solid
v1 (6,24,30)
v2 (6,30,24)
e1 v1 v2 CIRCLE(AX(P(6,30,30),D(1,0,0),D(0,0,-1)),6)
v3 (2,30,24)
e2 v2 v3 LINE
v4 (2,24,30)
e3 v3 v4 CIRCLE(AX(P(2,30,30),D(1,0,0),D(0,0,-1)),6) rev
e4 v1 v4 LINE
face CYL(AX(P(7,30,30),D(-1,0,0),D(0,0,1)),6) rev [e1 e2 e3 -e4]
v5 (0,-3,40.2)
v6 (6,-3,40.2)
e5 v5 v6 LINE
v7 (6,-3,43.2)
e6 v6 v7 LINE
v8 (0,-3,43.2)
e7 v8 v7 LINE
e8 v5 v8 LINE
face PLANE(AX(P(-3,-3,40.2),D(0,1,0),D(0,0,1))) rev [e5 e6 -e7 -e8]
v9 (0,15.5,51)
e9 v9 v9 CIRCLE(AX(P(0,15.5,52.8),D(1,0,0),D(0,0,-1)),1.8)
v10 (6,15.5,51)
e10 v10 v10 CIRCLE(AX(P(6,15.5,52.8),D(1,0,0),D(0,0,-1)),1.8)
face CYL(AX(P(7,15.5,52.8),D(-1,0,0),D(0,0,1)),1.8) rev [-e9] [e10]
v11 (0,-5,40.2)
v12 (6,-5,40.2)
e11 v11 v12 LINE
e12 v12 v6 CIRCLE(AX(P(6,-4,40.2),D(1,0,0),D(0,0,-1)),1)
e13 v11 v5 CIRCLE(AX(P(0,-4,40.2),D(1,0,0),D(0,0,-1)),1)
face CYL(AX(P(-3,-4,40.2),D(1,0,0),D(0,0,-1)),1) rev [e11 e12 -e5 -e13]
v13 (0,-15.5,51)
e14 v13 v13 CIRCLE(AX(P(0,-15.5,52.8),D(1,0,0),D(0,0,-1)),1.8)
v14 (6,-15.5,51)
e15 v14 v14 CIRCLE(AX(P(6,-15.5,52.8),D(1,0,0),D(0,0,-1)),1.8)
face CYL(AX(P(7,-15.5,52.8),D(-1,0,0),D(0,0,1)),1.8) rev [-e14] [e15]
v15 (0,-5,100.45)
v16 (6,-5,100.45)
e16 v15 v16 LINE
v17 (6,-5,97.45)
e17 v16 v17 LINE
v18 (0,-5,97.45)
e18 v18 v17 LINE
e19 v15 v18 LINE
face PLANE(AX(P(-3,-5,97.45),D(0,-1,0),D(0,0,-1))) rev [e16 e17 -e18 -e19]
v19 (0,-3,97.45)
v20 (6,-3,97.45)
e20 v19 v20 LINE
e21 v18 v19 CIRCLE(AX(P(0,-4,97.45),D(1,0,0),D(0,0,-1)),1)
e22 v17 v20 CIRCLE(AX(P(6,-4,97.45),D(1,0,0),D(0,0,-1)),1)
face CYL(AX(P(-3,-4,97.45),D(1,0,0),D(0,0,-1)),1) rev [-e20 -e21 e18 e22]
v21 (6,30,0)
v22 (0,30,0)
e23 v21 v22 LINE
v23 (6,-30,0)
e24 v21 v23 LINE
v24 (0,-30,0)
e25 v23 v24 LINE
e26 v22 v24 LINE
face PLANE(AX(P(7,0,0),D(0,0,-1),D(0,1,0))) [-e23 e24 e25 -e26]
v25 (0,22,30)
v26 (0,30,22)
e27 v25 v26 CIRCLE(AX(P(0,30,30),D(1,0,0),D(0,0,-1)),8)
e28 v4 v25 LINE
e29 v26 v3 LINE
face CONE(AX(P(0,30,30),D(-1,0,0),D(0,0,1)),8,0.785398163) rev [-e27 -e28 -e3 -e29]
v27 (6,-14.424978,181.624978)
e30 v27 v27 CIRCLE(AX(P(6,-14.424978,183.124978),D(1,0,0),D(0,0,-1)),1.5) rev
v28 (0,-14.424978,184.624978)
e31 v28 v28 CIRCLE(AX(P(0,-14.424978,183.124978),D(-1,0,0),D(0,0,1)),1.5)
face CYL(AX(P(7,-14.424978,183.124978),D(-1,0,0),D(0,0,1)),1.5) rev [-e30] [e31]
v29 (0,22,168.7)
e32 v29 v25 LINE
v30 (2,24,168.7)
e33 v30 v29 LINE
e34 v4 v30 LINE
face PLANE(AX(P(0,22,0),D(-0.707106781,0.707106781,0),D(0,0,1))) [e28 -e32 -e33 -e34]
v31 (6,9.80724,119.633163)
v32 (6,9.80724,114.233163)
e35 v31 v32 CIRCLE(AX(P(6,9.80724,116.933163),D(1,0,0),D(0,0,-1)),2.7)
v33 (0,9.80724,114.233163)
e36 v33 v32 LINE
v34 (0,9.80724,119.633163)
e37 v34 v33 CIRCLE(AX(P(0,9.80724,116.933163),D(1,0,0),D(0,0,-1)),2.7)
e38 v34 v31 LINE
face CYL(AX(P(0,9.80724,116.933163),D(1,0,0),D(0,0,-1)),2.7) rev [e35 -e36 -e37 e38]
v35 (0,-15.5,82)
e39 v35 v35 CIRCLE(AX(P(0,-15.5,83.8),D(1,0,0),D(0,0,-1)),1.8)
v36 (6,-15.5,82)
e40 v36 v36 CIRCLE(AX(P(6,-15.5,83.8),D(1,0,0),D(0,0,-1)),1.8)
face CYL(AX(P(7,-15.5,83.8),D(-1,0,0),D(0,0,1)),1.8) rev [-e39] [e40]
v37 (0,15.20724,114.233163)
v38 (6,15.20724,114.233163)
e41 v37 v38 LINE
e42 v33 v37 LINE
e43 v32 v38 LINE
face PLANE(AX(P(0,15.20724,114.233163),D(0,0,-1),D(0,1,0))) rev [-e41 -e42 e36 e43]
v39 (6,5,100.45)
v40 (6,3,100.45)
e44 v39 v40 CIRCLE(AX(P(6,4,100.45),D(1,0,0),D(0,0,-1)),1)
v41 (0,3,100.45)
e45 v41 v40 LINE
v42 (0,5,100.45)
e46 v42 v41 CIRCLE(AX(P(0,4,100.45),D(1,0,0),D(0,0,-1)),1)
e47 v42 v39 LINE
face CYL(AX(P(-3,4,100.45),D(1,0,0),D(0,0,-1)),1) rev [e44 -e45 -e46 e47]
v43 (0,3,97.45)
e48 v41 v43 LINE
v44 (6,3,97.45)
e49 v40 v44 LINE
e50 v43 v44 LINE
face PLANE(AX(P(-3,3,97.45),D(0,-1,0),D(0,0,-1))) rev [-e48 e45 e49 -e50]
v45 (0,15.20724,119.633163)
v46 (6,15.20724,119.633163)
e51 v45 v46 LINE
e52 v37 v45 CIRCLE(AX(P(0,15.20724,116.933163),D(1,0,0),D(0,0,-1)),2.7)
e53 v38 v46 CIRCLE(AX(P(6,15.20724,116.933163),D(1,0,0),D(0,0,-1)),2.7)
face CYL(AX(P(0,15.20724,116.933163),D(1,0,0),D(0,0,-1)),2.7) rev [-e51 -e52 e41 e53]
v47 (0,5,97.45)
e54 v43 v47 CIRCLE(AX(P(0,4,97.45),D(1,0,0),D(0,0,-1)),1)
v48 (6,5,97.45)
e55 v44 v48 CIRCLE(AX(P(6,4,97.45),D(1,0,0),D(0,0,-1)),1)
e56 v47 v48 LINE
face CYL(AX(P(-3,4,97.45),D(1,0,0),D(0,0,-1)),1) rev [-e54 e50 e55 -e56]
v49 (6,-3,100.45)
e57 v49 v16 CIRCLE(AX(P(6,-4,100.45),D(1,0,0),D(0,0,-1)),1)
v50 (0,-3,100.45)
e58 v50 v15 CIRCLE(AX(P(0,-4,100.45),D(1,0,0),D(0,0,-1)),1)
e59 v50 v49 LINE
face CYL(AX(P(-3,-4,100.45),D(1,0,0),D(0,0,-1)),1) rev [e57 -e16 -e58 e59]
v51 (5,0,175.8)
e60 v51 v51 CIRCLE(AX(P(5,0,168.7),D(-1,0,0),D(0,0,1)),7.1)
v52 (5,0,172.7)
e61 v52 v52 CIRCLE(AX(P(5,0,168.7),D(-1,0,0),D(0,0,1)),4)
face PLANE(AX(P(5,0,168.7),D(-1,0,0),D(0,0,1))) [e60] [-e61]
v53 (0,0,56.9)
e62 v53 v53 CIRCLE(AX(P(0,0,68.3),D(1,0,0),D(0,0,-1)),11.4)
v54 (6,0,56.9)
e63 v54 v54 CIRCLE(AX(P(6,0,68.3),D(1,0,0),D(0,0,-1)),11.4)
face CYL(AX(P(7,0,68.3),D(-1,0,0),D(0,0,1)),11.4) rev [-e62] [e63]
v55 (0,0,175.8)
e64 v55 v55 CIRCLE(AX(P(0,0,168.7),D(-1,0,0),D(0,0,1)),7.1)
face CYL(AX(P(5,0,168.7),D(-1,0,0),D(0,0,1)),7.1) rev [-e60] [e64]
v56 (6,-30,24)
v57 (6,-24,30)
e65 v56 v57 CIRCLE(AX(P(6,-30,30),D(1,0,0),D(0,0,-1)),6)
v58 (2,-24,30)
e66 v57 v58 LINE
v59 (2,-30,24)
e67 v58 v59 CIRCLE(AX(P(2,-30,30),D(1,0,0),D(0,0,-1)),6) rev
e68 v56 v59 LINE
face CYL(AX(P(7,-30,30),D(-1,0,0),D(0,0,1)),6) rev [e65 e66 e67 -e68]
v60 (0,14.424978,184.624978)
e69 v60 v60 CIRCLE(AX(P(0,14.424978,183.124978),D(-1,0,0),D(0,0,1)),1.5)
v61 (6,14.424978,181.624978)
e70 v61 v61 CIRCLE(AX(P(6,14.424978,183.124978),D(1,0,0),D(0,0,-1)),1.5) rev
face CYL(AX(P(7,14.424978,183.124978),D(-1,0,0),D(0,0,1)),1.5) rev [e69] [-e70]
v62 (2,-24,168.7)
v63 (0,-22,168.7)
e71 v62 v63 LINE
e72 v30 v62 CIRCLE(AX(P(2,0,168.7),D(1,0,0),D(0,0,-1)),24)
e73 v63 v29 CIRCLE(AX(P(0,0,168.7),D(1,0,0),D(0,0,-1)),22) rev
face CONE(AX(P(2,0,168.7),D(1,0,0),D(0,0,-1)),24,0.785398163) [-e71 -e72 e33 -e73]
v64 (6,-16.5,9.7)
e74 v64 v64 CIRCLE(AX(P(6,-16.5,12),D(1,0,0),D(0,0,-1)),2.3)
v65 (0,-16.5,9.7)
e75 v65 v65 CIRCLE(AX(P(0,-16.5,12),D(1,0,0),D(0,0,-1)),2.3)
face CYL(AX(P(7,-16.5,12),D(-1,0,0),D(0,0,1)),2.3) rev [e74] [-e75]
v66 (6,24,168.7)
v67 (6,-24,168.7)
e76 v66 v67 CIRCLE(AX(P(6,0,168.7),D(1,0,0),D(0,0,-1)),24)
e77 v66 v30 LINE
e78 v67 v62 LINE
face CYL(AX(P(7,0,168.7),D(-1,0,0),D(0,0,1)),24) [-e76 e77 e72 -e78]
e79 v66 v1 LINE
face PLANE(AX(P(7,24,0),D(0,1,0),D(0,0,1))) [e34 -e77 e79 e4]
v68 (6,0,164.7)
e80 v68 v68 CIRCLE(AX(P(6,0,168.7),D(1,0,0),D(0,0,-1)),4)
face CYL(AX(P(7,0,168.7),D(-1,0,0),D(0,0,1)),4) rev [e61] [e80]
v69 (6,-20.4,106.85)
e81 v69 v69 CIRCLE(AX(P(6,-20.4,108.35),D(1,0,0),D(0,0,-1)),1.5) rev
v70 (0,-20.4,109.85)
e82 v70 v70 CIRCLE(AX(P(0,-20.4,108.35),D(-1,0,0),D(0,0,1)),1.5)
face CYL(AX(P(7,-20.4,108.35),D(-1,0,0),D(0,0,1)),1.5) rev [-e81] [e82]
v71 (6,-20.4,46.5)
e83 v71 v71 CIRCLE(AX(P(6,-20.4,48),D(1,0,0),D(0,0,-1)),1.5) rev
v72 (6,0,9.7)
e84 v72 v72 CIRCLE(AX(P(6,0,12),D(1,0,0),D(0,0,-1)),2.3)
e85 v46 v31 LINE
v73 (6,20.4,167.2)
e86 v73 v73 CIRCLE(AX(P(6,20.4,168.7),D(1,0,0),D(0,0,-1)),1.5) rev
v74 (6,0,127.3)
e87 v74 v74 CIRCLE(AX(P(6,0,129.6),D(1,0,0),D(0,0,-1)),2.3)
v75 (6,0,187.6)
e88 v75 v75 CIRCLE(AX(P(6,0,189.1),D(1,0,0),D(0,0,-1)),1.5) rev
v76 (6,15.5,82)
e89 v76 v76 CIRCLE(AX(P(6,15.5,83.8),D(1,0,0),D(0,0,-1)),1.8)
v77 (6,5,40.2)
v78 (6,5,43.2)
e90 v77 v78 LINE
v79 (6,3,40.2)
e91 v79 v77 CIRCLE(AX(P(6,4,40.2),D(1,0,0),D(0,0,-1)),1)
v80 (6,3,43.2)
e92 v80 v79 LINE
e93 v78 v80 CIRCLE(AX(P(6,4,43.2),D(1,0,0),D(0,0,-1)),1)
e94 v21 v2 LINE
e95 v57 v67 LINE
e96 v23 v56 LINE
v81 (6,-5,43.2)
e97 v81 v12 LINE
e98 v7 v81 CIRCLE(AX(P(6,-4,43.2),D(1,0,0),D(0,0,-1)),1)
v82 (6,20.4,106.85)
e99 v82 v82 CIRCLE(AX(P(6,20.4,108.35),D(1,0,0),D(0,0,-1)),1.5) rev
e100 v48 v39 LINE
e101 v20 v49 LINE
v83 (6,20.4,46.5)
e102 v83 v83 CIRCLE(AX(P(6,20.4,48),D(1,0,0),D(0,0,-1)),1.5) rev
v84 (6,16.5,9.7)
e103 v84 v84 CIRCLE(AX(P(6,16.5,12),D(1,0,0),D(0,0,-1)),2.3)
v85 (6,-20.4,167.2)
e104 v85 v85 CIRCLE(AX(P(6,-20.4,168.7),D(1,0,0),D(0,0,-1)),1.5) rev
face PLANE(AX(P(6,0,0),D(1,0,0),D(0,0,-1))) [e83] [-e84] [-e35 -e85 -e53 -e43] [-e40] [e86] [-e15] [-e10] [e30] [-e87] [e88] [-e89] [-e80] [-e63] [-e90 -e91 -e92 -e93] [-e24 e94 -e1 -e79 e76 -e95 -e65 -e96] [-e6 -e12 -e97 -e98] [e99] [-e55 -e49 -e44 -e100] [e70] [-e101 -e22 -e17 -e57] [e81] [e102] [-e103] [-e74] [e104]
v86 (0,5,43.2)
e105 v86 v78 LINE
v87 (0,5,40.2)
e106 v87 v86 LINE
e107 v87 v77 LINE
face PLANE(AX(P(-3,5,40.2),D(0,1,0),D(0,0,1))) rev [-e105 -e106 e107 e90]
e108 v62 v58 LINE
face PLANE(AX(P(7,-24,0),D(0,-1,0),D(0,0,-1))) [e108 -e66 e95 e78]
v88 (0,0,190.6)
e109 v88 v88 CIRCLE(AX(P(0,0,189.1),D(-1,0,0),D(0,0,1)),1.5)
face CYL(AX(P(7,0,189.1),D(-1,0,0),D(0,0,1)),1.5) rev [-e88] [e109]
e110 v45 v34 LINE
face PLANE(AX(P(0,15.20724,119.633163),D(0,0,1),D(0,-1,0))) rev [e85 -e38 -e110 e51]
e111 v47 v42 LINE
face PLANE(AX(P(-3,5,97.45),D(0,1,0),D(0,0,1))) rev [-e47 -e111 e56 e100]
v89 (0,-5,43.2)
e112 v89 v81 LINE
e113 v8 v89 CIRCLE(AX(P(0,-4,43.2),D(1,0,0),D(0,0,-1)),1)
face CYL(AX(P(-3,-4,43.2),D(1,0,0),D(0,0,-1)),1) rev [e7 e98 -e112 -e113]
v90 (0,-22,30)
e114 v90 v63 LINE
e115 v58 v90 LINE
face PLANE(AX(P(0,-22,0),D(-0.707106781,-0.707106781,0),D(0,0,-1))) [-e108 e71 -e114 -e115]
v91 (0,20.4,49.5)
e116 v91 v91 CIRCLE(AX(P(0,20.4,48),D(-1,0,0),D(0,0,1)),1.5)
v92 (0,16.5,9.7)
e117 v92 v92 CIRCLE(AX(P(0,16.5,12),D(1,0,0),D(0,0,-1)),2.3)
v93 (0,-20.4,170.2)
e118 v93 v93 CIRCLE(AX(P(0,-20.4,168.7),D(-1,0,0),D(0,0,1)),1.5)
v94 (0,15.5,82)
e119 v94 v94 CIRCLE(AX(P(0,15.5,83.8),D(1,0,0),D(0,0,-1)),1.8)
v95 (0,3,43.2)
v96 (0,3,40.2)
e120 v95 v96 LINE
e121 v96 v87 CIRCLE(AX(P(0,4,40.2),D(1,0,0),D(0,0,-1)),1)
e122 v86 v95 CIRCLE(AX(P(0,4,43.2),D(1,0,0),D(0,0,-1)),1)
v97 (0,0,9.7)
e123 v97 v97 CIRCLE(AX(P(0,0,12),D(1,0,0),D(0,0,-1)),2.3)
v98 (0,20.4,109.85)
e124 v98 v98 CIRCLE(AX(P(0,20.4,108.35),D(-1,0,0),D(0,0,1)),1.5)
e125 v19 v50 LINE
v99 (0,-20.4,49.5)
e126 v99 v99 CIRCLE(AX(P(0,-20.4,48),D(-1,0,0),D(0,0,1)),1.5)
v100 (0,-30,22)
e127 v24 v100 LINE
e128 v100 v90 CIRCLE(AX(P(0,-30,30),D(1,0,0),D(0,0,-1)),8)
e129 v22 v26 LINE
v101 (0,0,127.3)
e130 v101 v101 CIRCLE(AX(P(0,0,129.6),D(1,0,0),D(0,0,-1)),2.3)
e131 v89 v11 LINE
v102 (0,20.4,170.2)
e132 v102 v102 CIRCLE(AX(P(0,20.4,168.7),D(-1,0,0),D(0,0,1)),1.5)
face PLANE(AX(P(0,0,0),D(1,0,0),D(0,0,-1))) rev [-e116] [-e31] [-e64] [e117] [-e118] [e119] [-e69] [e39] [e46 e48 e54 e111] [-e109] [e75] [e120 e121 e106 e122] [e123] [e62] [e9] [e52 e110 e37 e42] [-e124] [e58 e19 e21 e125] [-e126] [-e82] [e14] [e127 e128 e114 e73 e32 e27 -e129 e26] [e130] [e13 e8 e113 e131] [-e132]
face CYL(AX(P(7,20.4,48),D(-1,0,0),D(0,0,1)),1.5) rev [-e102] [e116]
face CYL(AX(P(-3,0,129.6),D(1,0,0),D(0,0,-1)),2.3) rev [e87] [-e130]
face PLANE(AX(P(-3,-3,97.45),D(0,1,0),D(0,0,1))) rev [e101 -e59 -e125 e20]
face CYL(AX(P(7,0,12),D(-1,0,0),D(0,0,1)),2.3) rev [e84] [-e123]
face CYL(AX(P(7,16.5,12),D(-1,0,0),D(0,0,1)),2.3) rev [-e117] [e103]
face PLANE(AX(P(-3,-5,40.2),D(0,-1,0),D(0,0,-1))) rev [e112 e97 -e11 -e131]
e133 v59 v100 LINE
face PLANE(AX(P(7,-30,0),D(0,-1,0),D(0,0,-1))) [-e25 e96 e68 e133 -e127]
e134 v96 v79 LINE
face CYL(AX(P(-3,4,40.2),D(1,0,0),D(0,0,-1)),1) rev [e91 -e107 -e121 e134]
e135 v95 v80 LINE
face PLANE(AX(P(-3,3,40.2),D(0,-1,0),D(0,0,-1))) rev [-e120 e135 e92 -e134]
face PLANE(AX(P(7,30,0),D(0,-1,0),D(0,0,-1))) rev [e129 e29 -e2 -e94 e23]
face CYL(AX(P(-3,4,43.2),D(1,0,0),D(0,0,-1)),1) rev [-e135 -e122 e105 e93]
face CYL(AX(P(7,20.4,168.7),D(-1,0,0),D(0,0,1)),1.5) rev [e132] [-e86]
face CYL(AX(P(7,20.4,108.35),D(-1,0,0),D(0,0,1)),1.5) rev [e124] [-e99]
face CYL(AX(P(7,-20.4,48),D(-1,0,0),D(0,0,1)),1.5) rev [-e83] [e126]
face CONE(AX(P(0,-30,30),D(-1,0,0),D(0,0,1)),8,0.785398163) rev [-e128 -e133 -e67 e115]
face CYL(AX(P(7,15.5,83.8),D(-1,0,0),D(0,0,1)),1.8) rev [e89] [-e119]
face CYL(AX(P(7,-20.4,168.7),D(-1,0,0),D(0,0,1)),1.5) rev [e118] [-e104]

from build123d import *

# Parameters (mm, degrees)
SKETCH1_R              = 11.4
SKETCH1_R_2            = 1.8
SKETCH1_R_3            = 2.3
SKETCH1_R_4            = 4
BOSS_EXTRUDE1_DEPTH    = 7
CHAMFER2_SIZE          = 2
CUT_EXTRUDE2_DEPTH     = 196.146842147
SKETCH4_R              = 1.5
CUT_EXTRUDE3_DEPTH     = 196.146842147
SKETCH6_R              = 7.1
CUT_EXTRUDE4_DEPTH     = 5
SKETCH7_R              = 2.3
CUT_EXTRUDE5_DEPTH     = 10
CUT_EXTRUDE6_DEPTH     = 10
MOVE_START             = 6
MOVE_FACE2_OUTLINE_R   = 2.3
MOVE_FACE2_OUTLINE_R_2 = 1.5
MOVE_FACE2_OUTLINE_R_3 = 1.8
MOVE_FACE2_OUTLINE_R_4 = 11.4
MOVE_FACE2_OUTLINE_R_5 = 4
MOVE_FACE2_DEPTH       = 1


# Read off the part's stored shape, not the designer's step: Move Face2
with BuildPart() as part:
    # Sketch1 → Boss-Extrude1 (new body)
    with BuildSketch(Plane(origin=(0, 0, 0), x_dir=(0, 0, -1), z_dir=(1, 0, 0))):
        with BuildLine():
            Line((-168.7, 24), (-30, 24))
            ThreePointArc((-30, 24), (-25.757359313, 25.757359313), (-24, 30))
            Line((-24, 30), (-12, 30))
            Line((-12, 30), (0, 30))
            Line((0, 30), (0, 24))
            Line((0, 24), (0, 0))
            Line((0, 0), (0, -24))
            Line((0, -24), (0, -30))
            Line((0, -30), (-12, -30))
            Line((-12, -30), (-24, -30))
            ThreePointArc((-24, -30), (-25.757359313, -25.757359313), (-30, -24))
            Line((-30, -24), (-168.7, -24))
            ThreePointArc((-168.7, -24), (-192.7, 0), (-168.7, 24))
        make_face()
        with Locations((-68.3, 0)):
            Circle(SKETCH1_R, mode=Mode.SUBTRACT)
        with Locations((-83.8, 15.5)):
            Circle(SKETCH1_R_2, mode=Mode.SUBTRACT)
        with Locations((-52.8, 15.5)):
            Circle(SKETCH1_R_2, mode=Mode.SUBTRACT)
        with Locations((-83.8, -15.5)):
            Circle(SKETCH1_R_2, mode=Mode.SUBTRACT)
        with Locations((-52.8, -15.5)):
            Circle(SKETCH1_R_2, mode=Mode.SUBTRACT)
        with Locations((-12, 16.5)):
            Circle(SKETCH1_R_3, mode=Mode.SUBTRACT)
        with Locations((-12, 0)):
            Circle(SKETCH1_R_3, mode=Mode.SUBTRACT)
        with Locations((-12, -16.5)):
            Circle(SKETCH1_R_3, mode=Mode.SUBTRACT)
        with Locations((-168.7, 0)):
            Circle(SKETCH1_R_4, mode=Mode.SUBTRACT)
    extrude(amount=BOSS_EXTRUDE1_DEPTH)

    # Chamfer2
    chamfer2_edges = [part.edges().sort_by_distance(p)[0] for p in [
        (0, -25.757359313, 25.757359313),
        (0, -24, 99.35),
        (0, 0, 192.7),
        (0, 24, 99.35),
        (0, 25.757359313, 25.757359313),
    ]]
    chamfer(chamfer2_edges, length=CHAMFER2_SIZE)

    # Sketch3 → Cut-Extrude2 (cut, through all)
    with BuildSketch(Plane(origin=(7, 0, 0), x_dir=(0, 0, -1), z_dir=(1, 0, 0))):
        with BuildLine():
            Line((-114.233163347, 15.207239819), (-114.233163347, 9.807239819))
            ThreePointArc((-114.233163347, 9.807239819), (-116.933163347, 7.107239819), (-119.633163347, 9.807239819))
            Line((-119.633163347, 9.807239819), (-119.633163347, 15.207239819))
            ThreePointArc((-119.633163347, 15.207239819), (-116.933163347, 17.907239819), (-114.233163347, 15.207239819))
        make_face()
    extrude(amount=-CUT_EXTRUDE2_DEPTH, mode=Mode.SUBTRACT)

    # Sketch4 → Cut-Extrude3 (cut, through all)
    with BuildSketch(Plane.ZY):
        with Locations((108.35, -20.4)):
            Circle(SKETCH4_R)
        with Locations((168.7, -20.4)):
            Circle(SKETCH4_R)
        with Locations((168.7, 20.4)):
            Circle(SKETCH4_R)
        with Locations((183.124978336, 14.424978336)):
            Circle(SKETCH4_R)
        with Locations((189.1, 0)):
            Circle(SKETCH4_R)
        with Locations((183.124978336, -14.424978336)):
            Circle(SKETCH4_R)
        with Locations((108.35, 20.4)):
            Circle(SKETCH4_R)
        with Locations((48, -20.4)):
            Circle(SKETCH4_R)
        with Locations((48, 20.4)):
            Circle(SKETCH4_R)
    extrude(amount=-CUT_EXTRUDE3_DEPTH, mode=Mode.SUBTRACT)

    # Sketch6 → Cut-Extrude4 (cut)
    with BuildSketch(Plane.ZY):
        with Locations((168.7, 0)):
            Circle(SKETCH6_R)
    extrude(amount=-CUT_EXTRUDE4_DEPTH, mode=Mode.SUBTRACT)

    # Sketch7 → Cut-Extrude5 (cut)
    with BuildSketch(Plane(origin=(7, 0, 0), x_dir=(0, 0, -1), z_dir=(1, 0, 0))):
        with Locations((-129.6, 0)):
            Circle(SKETCH7_R)
    extrude(amount=-CUT_EXTRUDE5_DEPTH, mode=Mode.SUBTRACT)

    # Sketch8 → Cut-Extrude6 (cut)
    with BuildSketch(Plane(origin=(7, 0, 0), x_dir=(0, 0, -1), z_dir=(1, 0, 0))):
        with BuildLine():
            Line((-97.45, -5), (-100.45, -5))
            ThreePointArc((-100.45, -5), (-101.45, -4), (-100.45, -3))
            Line((-100.45, -3), (-97.45, -3))
            ThreePointArc((-97.45, -3), (-96.45, -4), (-97.45, -5))
        make_face()
        with BuildLine():
            Line((-97.45, 5), (-100.45, 5))
            ThreePointArc((-100.45, 5), (-101.45, 4), (-100.45, 3))
            Line((-100.45, 3), (-97.45, 3))
            ThreePointArc((-97.45, 3), (-96.45, 4), (-97.45, 5))
        make_face()
        with BuildLine():
            Line((-40.2, -5), (-43.2, -5))
            ThreePointArc((-43.2, -5), (-44.2, -4), (-43.2, -3))
            Line((-43.2, -3), (-40.2, -3))
            ThreePointArc((-40.2, -3), (-39.2, -4), (-40.2, -5))
        make_face()
        with BuildLine():
            Line((-40.2, 5), (-43.2, 5))
            ThreePointArc((-43.2, 5), (-44.2, 4), (-43.2, 3))
            Line((-43.2, 3), (-40.2, 3))
            ThreePointArc((-40.2, 3), (-39.2, 4), (-40.2, 5))
        make_face()
    extrude(amount=-CUT_EXTRUDE6_DEPTH, mode=Mode.SUBTRACT)

    # Move Face2 outline → Move Face2 (cut)
    with BuildSketch(Plane.YZ.offset(MOVE_START)):
        with BuildLine():
            Line((-30, 24), (-30, 0))
            Line((-30, 0), (30, 0))
            Line((30, 0), (30, 24))
            ThreePointArc((30, 24), (25.757359313, 25.757359313), (24, 30))
            Line((24, 30), (24, 168.7))
            ThreePointArc((24, 168.7), (0, 192.7), (-24, 168.7))
            Line((-24, 168.7), (-24, 30))
            ThreePointArc((-24, 30), (-25.757359313, 25.757359313), (-30, 24))
        make_face()
        with Locations((-16.5, 12)):
            Circle(MOVE_FACE2_OUTLINE_R, mode=Mode.SUBTRACT)
        with Locations((-20.4, 48)):
            Circle(MOVE_FACE2_OUTLINE_R_2, mode=Mode.SUBTRACT)
        with BuildLine():
            Line((-5, 40.2), (-5, 43.2))
            ThreePointArc((-5, 43.2), (-4, 44.2), (-3, 43.2))
            Line((-3, 43.2), (-3, 40.2))
            ThreePointArc((-3, 40.2), (-4, 39.2), (-5, 40.2))
        make_face(mode=Mode.SUBTRACT)
        with Locations((-15.5, 52.8)):
            Circle(MOVE_FACE2_OUTLINE_R_3, mode=Mode.SUBTRACT)
        with Locations((-15.5, 83.8)):
            Circle(MOVE_FACE2_OUTLINE_R_3, mode=Mode.SUBTRACT)
        with Locations((0, 12)):
            Circle(MOVE_FACE2_OUTLINE_R, mode=Mode.SUBTRACT)
        with BuildLine():
            ThreePointArc((5, 40.2), (4, 39.2), (3, 40.2))
            Line((3, 40.2), (3, 43.2))
            ThreePointArc((3, 43.2), (4, 44.2), (5, 43.2))
            Line((5, 43.2), (5, 40.2))
        make_face(mode=Mode.SUBTRACT)
        with Locations((16.5, 12)):
            Circle(MOVE_FACE2_OUTLINE_R, mode=Mode.SUBTRACT)
        with Locations((20.4, 48)):
            Circle(MOVE_FACE2_OUTLINE_R_2, mode=Mode.SUBTRACT)
        with Locations((0, 68.3)):
            Circle(MOVE_FACE2_OUTLINE_R_4, mode=Mode.SUBTRACT)
        with Locations((15.5, 52.8)):
            Circle(MOVE_FACE2_OUTLINE_R_3, mode=Mode.SUBTRACT)
        with Locations((15.5, 83.8)):
            Circle(MOVE_FACE2_OUTLINE_R_3, mode=Mode.SUBTRACT)
        with Locations((-20.4, 108.35)):
            Circle(MOVE_FACE2_OUTLINE_R_2, mode=Mode.SUBTRACT)
        with BuildLine():
            ThreePointArc((-3, 97.45), (-4, 96.45), (-5, 97.45))
            Line((-5, 97.45), (-5, 100.45))
            ThreePointArc((-5, 100.45), (-4, 101.45), (-3, 100.45))
            Line((-3, 100.45), (-3, 97.45))
        make_face(mode=Mode.SUBTRACT)
        with Locations((-20.4, 168.7)):
            Circle(MOVE_FACE2_OUTLINE_R_2, mode=Mode.SUBTRACT)
        with Locations((-14.424978336, 183.124978336)):
            Circle(MOVE_FACE2_OUTLINE_R_2, mode=Mode.SUBTRACT)
        with BuildLine():
            Line((3, 97.45), (3, 100.45))
            ThreePointArc((3, 100.45), (4, 101.45), (5, 100.45))
            Line((5, 100.45), (5, 97.45))
            ThreePointArc((5, 97.45), (4, 96.45), (3, 97.45))
        make_face(mode=Mode.SUBTRACT)
        with BuildLine():
            ThreePointArc((15.207239819, 119.633163347), (17.907239819, 116.933163347), (15.207239819, 114.233163347))
            Line((15.207239819, 114.233163347), (9.807239819, 114.233163347))
            ThreePointArc((9.807239819, 114.233163347), (7.107239819, 116.933163347), (9.807239819, 119.633163347))
            Line((9.807239819, 119.633163347), (15.207239819, 119.633163347))
        make_face(mode=Mode.SUBTRACT)
        with Locations((0, 129.6)):
            Circle(MOVE_FACE2_OUTLINE_R, mode=Mode.SUBTRACT)
        with Locations((20.4, 108.35)):
            Circle(MOVE_FACE2_OUTLINE_R_2, mode=Mode.SUBTRACT)
        with Locations((0, 168.7)):
            Circle(MOVE_FACE2_OUTLINE_R_5, mode=Mode.SUBTRACT)
        with Locations((0, 189.1)):
            Circle(MOVE_FACE2_OUTLINE_R_2, mode=Mode.SUBTRACT)
        with Locations((14.424978336, 183.124978336)):
            Circle(MOVE_FACE2_OUTLINE_R_2, mode=Mode.SUBTRACT)
        with Locations((20.4, 168.7)):
            Circle(MOVE_FACE2_OUTLINE_R_2, mode=Mode.SUBTRACT)
    extrude(amount=MOVE_FACE2_DEPTH, mode=Mode.SUBTRACT)


solid = part.part
